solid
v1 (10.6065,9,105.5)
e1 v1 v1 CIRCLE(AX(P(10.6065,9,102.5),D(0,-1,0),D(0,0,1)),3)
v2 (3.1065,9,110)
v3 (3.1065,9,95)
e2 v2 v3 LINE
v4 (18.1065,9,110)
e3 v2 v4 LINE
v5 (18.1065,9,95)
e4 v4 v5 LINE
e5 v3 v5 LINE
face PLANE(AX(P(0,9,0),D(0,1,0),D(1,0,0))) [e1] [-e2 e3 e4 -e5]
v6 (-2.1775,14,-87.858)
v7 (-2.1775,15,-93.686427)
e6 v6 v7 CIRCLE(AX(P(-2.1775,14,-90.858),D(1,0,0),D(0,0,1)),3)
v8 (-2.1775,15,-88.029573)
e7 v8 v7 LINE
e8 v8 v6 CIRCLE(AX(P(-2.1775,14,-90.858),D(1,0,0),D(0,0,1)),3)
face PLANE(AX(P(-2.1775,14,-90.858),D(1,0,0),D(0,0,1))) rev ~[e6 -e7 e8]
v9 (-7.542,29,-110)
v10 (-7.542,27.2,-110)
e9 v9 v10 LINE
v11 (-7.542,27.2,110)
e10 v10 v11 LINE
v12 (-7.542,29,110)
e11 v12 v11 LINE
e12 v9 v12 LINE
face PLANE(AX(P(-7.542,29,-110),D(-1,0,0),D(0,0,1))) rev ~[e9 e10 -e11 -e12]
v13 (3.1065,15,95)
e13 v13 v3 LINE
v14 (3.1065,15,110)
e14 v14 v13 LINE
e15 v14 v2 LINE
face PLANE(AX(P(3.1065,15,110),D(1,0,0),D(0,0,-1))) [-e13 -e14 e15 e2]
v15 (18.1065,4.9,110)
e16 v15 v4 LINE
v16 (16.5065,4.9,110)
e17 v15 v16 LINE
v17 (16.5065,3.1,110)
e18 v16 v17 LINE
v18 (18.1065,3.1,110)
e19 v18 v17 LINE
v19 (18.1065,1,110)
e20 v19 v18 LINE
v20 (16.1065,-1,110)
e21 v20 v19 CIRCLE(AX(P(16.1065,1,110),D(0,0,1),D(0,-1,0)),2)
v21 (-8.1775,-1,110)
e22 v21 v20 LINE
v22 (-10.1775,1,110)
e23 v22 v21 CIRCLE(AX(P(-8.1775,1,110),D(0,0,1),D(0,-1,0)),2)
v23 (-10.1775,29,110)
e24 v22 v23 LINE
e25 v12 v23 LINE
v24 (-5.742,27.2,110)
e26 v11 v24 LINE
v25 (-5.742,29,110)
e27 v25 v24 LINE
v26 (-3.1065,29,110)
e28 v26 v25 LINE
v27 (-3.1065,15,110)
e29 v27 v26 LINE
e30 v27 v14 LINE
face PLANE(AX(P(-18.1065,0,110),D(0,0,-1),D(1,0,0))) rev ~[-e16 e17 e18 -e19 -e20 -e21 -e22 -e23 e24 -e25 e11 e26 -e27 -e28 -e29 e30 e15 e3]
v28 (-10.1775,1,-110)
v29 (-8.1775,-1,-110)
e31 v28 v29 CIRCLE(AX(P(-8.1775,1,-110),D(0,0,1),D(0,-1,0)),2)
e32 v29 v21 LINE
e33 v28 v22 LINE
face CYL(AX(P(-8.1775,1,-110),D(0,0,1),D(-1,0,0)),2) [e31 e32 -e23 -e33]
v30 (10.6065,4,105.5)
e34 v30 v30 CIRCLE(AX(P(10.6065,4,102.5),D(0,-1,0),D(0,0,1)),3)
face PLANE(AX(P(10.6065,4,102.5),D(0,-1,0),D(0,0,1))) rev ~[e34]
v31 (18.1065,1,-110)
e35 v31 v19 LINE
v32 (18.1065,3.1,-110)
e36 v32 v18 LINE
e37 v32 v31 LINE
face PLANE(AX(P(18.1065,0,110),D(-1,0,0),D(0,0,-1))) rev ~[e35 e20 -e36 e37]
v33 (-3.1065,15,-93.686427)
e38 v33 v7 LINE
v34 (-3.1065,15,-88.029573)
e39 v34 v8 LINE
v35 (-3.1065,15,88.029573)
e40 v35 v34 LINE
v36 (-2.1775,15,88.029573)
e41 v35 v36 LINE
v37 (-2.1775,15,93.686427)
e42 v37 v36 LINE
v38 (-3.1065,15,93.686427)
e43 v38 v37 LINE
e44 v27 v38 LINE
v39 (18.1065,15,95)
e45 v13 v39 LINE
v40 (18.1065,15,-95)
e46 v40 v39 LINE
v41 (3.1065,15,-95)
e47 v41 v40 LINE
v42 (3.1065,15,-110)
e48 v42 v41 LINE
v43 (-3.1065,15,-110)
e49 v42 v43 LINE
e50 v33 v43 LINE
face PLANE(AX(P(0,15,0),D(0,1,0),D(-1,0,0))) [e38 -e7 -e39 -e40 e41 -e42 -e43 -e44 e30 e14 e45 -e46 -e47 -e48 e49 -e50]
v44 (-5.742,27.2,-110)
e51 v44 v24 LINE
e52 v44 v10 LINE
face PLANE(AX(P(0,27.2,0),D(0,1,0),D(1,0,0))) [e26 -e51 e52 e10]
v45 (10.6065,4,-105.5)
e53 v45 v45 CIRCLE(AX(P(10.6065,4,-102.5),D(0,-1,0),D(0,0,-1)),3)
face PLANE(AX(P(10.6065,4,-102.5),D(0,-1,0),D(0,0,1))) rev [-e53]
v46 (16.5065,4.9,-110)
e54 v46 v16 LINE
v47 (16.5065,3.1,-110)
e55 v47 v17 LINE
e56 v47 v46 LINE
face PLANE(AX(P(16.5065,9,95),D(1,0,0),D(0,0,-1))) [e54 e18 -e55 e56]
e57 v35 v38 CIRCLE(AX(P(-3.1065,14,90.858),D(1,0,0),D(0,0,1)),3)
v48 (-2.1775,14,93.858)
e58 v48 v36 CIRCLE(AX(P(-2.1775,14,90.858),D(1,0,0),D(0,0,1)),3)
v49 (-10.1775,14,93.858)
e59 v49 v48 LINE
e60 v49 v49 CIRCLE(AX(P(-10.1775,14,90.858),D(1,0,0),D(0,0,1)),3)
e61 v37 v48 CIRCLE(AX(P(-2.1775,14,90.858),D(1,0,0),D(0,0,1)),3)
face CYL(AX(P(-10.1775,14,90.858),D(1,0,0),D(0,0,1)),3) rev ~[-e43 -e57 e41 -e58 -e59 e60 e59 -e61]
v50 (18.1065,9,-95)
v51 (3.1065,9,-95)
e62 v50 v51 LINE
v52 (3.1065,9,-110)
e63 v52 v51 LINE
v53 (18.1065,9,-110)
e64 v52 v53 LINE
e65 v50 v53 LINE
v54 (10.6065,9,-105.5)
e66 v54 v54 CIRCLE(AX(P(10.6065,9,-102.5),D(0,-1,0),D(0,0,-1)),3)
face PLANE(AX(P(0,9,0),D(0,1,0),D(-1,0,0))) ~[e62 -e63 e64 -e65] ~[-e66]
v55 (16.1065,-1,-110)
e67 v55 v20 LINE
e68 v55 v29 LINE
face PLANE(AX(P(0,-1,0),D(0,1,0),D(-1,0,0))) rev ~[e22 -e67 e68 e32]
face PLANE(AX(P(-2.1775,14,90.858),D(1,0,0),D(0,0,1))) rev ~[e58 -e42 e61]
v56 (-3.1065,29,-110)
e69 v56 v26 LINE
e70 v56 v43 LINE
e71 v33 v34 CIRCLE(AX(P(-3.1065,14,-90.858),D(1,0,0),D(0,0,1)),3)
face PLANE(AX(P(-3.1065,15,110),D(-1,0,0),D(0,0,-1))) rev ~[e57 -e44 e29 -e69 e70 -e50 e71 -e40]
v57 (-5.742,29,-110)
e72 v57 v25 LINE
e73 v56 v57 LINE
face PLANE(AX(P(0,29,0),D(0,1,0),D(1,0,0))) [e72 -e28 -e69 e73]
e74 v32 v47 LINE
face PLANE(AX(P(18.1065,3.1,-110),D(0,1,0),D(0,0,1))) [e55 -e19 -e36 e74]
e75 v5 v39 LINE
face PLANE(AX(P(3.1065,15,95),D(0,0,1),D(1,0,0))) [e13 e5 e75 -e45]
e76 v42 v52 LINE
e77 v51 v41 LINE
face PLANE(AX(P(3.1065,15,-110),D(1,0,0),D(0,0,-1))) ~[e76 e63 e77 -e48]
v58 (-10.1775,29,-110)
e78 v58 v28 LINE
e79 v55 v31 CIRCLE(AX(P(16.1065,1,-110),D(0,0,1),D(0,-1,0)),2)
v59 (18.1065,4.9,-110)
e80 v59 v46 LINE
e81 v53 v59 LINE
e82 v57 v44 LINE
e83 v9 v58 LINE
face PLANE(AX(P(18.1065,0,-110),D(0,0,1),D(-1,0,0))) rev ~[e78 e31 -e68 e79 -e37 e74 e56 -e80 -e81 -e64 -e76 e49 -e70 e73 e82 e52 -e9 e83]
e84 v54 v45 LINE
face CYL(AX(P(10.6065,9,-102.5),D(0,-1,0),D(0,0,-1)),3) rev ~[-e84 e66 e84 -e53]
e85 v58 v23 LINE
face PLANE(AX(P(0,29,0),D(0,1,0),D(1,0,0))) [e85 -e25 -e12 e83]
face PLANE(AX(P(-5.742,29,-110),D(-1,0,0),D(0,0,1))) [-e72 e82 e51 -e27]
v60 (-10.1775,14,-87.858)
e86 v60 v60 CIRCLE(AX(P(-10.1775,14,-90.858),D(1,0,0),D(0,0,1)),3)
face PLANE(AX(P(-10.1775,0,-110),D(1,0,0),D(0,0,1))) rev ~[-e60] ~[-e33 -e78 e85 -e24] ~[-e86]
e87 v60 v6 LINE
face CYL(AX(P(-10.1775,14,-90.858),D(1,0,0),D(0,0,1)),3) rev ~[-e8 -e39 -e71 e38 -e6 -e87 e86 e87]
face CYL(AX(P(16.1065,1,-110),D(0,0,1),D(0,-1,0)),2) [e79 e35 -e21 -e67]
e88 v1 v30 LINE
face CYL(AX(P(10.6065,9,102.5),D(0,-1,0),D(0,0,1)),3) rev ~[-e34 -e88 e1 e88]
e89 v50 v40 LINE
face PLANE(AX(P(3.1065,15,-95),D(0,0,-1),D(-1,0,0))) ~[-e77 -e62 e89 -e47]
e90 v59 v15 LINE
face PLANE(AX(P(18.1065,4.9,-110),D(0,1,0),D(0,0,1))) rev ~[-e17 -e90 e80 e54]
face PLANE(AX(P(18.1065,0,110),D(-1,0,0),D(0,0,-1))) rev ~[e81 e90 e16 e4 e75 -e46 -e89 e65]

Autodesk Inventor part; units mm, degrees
ref_plane "YZ Plane" through (0, 0, 0) normal (1, 0, 0) x (0, 1, 0)
ref_plane "XZ Plane" through (0, 0, 0) normal (0, 1, 0) x (-1, 0, 0)
ref_plane "XY Plane" through (0, 0, 0) normal (0, 0, 1) x (1, 0, 0)
sketch "Sketch1" plane through (0, 0, 0) normal (0, 1, 0) x (-1, 0, 0)
  line L0 (18.1065, 110) -> (-18.1065, 110)
  line L1 (-18.1065, 110) -> (-18.1065, -110)
  line L2 (-18.1065, -110) -> (18.1065, -110)
  line L3 (18.1065, -110) -> (18.1065, 110)
  point P0 (0, 0)
  point P1 (0, 110)
  point P2 (18.1065, 0)
  dimension "d0" = 220
  dimension "d1" = 36.213
extrude "Extrusion1" add sketch "Sketch1" along normal blind 15
sketch "Sketch2" plane through (0, 15, 0) normal (0, 1, 0) x (1, 0, 0)
  line L0 (-18.1065, 110) -> (-18.1065, -110) projected
  line L1 (18.1065, 110) -> (-18.1065, 110) projected
  line L2 (-18.1065, -110) -> (-3.1065, -110)
  line L3 (-3.1065, -110) -> (-3.1065, 110)
  line L4 (-3.1065, 110) -> (-18.1065, 110)
  line L5 (-18.1065, 110) -> (-18.1065, -110)
  point P0 (0, 0)
  dimension "d4" = 15
extrude "Extrusion2" add sketch "Sketch2" along normal blind 14
sketch "Sketch3" plane through (0, 15, 0) normal (0, 1, 0) x (1, 0, 0)
  line L0 (-18.1065, -110) -> (18.1065, -110) projected
  line L1 (18.1065, -110) -> (3.1065, -110)
  line L2 (3.1065, -110) -> (3.1065, -95)
  line L3 (3.1065, -95) -> (18.1065, -95)
  line L4 (18.1065, -95) -> (18.1065, -110)
  point P0 (0, 0)
  dimension "d7" = 15
  dimension "d8" = 15
extrude "Extrusion3" cut sketch "Sketch3" against normal blind 6
mirror "Mirror1" about plane through (0, 0, 0) normal (0, 0, 1) of "Extrusion3"
sketch "Sketch4" plane through (0, 9, 0) normal (0, 1, 0) x (1, 0, 0)
  line L0 (18.1065, -95) -> (18.1065, -110) projected
  line L1 (18.1065, -110) -> (3.1065, -110) projected
  point P0 (0, 0)
  point P1 (10.6065, -102.5)
  point P2 (18.1065, -102.5)
  dimension "d11" = 7.5
  dimension "d12" = 7.5
hole "Hole1" at (10.6065, 9, 102.5) direction (0, -1, 0) diameter 6 depth 5
mirror "Mirror2" about plane through (0, 0, 0) normal (0, 0, 1) of "Hole1"
sketch "Sketch5" plane through (-18.1065, 0, 110) normal (0, 0, 1) x (1, 0, 0)
  point P0 (18.1065, 0)
move faces "Move2" translate (7.929, 0, 0) faces at (-18.1065, 9.6667, -36.6667)
move faces "Move3" translate (0, -1, 0) faces at (8.6785, 0, 36.6667)
sketch "Sketch6" plane through (18.1065, 9, 95) normal (1, 0, 0) x (0, 0, -1)
  line L0 (205, -10) -> (205, 0) projected
  line L1 (-15, -10) -> (-15, 0) projected
  line L2 (205, -5.9) -> (-15, -5.9)
  line L3 (205, -5) -> (-15, -5)
  line L4 (205, -4.1) -> (-15, -4.1)
  line L5 (205, -4.1) -> (205, -5.9)
  line L6 (205, -10) -> (205, 20) projected
  line L7 (-15, -4.1) -> (-15, -5.9)
  point P0 (95, -9)
  dimension "d29" = 1.8
extrude "Extrusion4" cut sketch "Sketch6" against normal blind 1.6
sketch "Sketch7" plane through (0, 29, 0) normal (0, 1, 0) x (1, 0, 0)
  line L0 (-6.642, 113.6406) -> (-6.642, -120.3961) construction
  line L1 (-3.1065, 110) -> (-10.1775, 110) projected
  line L2 (18.1065, 110) -> (-10.1775, 110) projected
  line L3 (-5.742, 110) -> (-5.742, -110)
  line L4 (-10.1775, -110) -> (-3.1065, -110) projected
  line L5 (-7.542, 110) -> (-7.542, -110)
  line L6 (-5.742, 110) -> (-7.542, 110)
  line L7 (-5.742, -110) -> (-7.542, -110)
  point P0 (0, 0)
  point P1 (-6.642, 110)
  point P2 (-7.542, 110)
  point P3 (-7.542, -110)
  point P4 (-5.742, 110)
  dimension "d35" = 1.8
extrude "Extrusion5" cut sketch "Sketch7" against normal blind 1.8
sketch "Sketch16" plane through (-10.1775, 29, -110) normal (-1, 0, 0) x (0, 0, 1)
  line L0 (0, -30) -> (0, 0) projected
  line L1 (220, -30) -> (220, 0) projected
  line L2 (0, 0) -> (220, 0) projected
  point P0 (110, -29)
  point P1 (19.142, -15)
  point P2 (200.858, -15)
  dimension "d75" = 181.716
  dimension "d76" = 220
  dimension "d77" = 19.142
  dimension "d78" = 30
  dimension "d79" = 15
hole "Hole6" at (-10.1775, 14, 90.858) at (-10.1775, 14, -90.858) direction (1, 0, 0) diameter 6 depth 8
fillet "Fillet1" radius 2 1 edges at (-10.1775, -1, 0)
fillet "Fillet2" radius 2 1 edges at (18.1065, -1, 0)
equation "\"d8\" = d7"
equation "\"d11\" = 0.5 * d7"
equation "\"d12\" = 0.5 * d8"
equation "\"d77\" = -0.5 * d75 + 0.5 * d76"
equation "\"d79\" = 0.5 * d78"
properties part number "top_edge" material "ABS Plastic"
